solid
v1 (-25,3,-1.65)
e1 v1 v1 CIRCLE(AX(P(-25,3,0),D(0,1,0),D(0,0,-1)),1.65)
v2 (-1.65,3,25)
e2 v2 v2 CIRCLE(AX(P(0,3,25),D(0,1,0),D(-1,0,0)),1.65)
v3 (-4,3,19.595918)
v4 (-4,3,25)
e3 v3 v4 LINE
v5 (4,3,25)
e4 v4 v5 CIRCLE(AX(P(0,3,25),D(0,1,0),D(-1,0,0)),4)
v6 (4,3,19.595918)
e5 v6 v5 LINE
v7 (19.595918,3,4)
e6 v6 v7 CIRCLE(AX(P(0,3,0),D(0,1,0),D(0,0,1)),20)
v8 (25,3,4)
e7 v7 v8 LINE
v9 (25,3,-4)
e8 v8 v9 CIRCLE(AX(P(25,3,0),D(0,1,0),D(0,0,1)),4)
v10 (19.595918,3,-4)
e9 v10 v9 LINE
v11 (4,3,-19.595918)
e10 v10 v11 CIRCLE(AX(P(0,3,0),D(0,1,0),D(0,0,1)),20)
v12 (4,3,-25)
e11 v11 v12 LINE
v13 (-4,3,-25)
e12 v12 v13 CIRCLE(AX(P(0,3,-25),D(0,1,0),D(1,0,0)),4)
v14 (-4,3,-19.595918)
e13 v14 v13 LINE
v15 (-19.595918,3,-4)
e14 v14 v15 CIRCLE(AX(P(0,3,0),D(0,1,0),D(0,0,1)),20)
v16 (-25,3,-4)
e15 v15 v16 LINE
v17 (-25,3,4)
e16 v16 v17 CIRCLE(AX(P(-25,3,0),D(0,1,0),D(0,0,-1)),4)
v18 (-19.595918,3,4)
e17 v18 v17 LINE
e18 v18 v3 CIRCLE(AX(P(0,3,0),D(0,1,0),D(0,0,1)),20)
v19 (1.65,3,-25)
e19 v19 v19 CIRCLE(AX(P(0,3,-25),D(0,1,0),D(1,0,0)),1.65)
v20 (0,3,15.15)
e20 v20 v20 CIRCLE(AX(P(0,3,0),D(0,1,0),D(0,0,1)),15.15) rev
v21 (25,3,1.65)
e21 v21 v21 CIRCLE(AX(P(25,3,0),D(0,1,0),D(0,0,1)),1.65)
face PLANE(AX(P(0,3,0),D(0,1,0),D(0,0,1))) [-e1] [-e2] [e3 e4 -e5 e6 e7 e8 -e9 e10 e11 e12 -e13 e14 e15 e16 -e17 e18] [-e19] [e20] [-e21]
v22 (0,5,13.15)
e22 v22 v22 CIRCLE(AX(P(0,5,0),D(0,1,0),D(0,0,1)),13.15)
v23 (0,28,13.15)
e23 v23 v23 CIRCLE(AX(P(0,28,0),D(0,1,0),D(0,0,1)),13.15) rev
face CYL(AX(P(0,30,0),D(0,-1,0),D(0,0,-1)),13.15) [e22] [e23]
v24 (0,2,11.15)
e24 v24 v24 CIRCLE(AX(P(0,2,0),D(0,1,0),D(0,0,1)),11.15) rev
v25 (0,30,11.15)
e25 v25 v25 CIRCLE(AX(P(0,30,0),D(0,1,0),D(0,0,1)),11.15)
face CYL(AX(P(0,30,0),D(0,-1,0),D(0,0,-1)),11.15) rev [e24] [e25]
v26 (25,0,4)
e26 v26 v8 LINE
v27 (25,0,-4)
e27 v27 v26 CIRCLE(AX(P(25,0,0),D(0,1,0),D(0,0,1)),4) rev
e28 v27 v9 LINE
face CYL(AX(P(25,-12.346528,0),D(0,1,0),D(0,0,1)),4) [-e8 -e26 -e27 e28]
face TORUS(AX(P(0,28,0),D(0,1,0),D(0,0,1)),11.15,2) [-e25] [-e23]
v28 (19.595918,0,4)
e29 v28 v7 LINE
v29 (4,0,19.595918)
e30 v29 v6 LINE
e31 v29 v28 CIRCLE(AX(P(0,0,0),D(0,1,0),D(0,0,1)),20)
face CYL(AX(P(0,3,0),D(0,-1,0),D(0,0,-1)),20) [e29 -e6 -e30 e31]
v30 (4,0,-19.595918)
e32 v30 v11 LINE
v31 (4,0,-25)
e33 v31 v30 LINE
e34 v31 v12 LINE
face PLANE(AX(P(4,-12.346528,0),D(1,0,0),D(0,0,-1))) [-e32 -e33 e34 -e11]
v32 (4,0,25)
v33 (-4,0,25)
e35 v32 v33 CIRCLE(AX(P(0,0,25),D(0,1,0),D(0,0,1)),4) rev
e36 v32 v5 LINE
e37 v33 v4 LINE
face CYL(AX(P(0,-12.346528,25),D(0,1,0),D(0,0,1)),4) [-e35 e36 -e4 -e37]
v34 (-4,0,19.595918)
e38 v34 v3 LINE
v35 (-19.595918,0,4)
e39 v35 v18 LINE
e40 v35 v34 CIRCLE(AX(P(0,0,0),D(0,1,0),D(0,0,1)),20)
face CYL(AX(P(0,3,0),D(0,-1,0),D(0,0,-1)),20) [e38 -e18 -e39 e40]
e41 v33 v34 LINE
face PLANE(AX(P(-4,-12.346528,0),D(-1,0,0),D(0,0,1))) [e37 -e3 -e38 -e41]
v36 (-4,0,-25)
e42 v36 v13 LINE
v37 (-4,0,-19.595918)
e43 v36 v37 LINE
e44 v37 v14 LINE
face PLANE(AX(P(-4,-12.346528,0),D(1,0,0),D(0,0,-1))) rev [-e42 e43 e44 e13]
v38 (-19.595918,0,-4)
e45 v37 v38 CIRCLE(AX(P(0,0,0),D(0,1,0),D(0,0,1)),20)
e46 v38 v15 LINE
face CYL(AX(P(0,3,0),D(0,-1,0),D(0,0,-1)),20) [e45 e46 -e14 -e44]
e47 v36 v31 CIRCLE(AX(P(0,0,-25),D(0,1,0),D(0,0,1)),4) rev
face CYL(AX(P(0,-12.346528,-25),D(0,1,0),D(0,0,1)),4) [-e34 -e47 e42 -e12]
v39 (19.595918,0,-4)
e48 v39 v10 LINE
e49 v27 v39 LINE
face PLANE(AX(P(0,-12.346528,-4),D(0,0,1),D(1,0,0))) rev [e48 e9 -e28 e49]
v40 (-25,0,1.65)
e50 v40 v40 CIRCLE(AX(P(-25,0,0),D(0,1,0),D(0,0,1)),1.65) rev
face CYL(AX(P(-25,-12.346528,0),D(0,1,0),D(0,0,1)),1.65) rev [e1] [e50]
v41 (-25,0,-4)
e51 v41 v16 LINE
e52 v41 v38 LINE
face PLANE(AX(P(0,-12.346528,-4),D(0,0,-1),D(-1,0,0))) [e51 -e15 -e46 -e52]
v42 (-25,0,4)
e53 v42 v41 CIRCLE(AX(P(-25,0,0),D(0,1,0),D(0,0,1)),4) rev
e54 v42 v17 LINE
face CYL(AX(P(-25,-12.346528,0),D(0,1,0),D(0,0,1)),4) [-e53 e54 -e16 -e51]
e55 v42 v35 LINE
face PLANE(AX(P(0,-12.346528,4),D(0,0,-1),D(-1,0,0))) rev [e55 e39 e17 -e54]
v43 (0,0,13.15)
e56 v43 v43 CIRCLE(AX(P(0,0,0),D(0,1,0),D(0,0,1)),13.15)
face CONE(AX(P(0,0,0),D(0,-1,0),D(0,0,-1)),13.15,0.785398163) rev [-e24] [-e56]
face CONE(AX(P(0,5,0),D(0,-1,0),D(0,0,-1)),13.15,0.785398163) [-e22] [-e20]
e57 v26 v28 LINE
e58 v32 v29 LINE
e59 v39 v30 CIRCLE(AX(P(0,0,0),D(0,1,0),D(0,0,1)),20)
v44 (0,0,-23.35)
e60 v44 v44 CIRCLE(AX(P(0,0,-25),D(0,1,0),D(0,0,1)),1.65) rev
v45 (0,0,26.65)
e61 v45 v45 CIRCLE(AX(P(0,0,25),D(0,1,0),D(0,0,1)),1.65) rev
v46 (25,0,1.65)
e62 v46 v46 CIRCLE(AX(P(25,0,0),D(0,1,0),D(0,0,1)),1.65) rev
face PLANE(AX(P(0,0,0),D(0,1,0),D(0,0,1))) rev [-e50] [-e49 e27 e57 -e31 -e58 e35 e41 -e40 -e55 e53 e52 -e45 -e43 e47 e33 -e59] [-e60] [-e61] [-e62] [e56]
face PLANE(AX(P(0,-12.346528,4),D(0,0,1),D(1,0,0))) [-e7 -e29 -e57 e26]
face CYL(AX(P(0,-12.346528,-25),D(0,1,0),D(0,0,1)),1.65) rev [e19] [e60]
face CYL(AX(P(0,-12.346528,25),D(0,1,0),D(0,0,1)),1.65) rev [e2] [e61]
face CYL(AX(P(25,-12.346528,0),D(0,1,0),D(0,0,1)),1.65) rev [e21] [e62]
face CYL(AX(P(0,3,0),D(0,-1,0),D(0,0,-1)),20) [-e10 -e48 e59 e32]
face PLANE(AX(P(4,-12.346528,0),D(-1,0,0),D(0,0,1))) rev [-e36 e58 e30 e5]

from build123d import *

# Parameters (mm, degrees)
CIRCUNFERENCES_R     = 20
CIRCUNFERENCES_R_2   = 13.15
EXT_DEPTH            = 3
CIRCUNFERENCES_3_R   = 13.15
CIRCUNFERENCES_3_R_2 = 11.15
CENT_DEPTH           = 30
ARM_START            = -3
ARMS_R               = 1.65
ARM_DEPTH            = 3
CIRPATTERN1_COUNT    = 4
CHAMFER1_SIZE        = 2
CHAMFER2_SIZE        = 2
FILLET1_R            = 2


with BuildPart() as part:
    # Circunferences → EXT (new body)
    with BuildSketch(Plane(origin=(0, 0, 0), x_dir=(1, 0, 0), z_dir=(0, 1, 0))):
        with Locations(Location((0, 0, 0), (0, 0, 270))):
            Circle(CIRCUNFERENCES_R)
        with Locations(Location((0, 0, 0), (0, 0, 270))):
            Circle(CIRCUNFERENCES_R_2, mode=Mode.SUBTRACT)
    extrude(amount=EXT_DEPTH)

    # Circunferences<3> → CENT (add)
    with BuildSketch(Plane(origin=(0, 0, 0), x_dir=(1, 0, 0), z_dir=(0, 1, 0))):
        with Locations(Location((0, 0, 0), (0, 0, 270))):
            Circle(CIRCUNFERENCES_3_R)
        with Locations(Location((0, 0, 0), (0, 0, 270))):
            Circle(CIRCUNFERENCES_3_R_2, mode=Mode.SUBTRACT)
    extrude(amount=CENT_DEPTH)

    # ARMS → ARM (add)
    with BuildSketch(Plane(origin=(0, 3, 0), x_dir=(1, 0, 0), z_dir=(0, 1, 0)).offset(ARM_START)):
        with BuildLine():
            Line((25, 4), (19.595917942, 4))
            ThreePointArc((19.595917942, 4), (19.89872306, 2.01017924), (20, 0))
            ThreePointArc((20, 0), (19.89872306, -2.01017924), (19.595917942, -4))
            Line((19.595917942, -4), (25, -4))
            ThreePointArc((25, -4), (29, 0), (25, 4))
        make_face()
        with Locations(Location((25, 0, 0), (0, 0, 270))):
            Circle(ARMS_R, mode=Mode.SUBTRACT)
    arm = extrude(amount=ARM_DEPTH)

    # CirPattern1: ARM ×4 about axis
    cirpattern1_axis = Axis((0, 0, 0), (0, 1, 0))
    for i in range(1, CIRPATTERN1_COUNT):
        add(arm.rotate(cirpattern1_axis, i * 360 / CIRPATTERN1_COUNT))

    # Chamfer1
    chamfer1_edges = [part.edges().sort_by_distance(p)[0] for p in [
        (0, 0, -11.15),
    ]]
    chamfer(chamfer1_edges, length=CHAMFER1_SIZE)

    # Chamfer2
    chamfer2_edges = [part.edges().sort_by_distance(p)[0] for p in [
        (0, 3, -13.15),
    ]]
    chamfer(chamfer2_edges, length=CHAMFER2_SIZE)

    # Fillet1
    fillet1_edges = [part.edges().sort_by_distance(p)[0] for p in [
        (0, 30, -13.15),
    ]]
    fillet(fillet1_edges, radius=FILLET1_R - 0.0001)  # a hair under: the kernel refuses the full size


solid = part.part
